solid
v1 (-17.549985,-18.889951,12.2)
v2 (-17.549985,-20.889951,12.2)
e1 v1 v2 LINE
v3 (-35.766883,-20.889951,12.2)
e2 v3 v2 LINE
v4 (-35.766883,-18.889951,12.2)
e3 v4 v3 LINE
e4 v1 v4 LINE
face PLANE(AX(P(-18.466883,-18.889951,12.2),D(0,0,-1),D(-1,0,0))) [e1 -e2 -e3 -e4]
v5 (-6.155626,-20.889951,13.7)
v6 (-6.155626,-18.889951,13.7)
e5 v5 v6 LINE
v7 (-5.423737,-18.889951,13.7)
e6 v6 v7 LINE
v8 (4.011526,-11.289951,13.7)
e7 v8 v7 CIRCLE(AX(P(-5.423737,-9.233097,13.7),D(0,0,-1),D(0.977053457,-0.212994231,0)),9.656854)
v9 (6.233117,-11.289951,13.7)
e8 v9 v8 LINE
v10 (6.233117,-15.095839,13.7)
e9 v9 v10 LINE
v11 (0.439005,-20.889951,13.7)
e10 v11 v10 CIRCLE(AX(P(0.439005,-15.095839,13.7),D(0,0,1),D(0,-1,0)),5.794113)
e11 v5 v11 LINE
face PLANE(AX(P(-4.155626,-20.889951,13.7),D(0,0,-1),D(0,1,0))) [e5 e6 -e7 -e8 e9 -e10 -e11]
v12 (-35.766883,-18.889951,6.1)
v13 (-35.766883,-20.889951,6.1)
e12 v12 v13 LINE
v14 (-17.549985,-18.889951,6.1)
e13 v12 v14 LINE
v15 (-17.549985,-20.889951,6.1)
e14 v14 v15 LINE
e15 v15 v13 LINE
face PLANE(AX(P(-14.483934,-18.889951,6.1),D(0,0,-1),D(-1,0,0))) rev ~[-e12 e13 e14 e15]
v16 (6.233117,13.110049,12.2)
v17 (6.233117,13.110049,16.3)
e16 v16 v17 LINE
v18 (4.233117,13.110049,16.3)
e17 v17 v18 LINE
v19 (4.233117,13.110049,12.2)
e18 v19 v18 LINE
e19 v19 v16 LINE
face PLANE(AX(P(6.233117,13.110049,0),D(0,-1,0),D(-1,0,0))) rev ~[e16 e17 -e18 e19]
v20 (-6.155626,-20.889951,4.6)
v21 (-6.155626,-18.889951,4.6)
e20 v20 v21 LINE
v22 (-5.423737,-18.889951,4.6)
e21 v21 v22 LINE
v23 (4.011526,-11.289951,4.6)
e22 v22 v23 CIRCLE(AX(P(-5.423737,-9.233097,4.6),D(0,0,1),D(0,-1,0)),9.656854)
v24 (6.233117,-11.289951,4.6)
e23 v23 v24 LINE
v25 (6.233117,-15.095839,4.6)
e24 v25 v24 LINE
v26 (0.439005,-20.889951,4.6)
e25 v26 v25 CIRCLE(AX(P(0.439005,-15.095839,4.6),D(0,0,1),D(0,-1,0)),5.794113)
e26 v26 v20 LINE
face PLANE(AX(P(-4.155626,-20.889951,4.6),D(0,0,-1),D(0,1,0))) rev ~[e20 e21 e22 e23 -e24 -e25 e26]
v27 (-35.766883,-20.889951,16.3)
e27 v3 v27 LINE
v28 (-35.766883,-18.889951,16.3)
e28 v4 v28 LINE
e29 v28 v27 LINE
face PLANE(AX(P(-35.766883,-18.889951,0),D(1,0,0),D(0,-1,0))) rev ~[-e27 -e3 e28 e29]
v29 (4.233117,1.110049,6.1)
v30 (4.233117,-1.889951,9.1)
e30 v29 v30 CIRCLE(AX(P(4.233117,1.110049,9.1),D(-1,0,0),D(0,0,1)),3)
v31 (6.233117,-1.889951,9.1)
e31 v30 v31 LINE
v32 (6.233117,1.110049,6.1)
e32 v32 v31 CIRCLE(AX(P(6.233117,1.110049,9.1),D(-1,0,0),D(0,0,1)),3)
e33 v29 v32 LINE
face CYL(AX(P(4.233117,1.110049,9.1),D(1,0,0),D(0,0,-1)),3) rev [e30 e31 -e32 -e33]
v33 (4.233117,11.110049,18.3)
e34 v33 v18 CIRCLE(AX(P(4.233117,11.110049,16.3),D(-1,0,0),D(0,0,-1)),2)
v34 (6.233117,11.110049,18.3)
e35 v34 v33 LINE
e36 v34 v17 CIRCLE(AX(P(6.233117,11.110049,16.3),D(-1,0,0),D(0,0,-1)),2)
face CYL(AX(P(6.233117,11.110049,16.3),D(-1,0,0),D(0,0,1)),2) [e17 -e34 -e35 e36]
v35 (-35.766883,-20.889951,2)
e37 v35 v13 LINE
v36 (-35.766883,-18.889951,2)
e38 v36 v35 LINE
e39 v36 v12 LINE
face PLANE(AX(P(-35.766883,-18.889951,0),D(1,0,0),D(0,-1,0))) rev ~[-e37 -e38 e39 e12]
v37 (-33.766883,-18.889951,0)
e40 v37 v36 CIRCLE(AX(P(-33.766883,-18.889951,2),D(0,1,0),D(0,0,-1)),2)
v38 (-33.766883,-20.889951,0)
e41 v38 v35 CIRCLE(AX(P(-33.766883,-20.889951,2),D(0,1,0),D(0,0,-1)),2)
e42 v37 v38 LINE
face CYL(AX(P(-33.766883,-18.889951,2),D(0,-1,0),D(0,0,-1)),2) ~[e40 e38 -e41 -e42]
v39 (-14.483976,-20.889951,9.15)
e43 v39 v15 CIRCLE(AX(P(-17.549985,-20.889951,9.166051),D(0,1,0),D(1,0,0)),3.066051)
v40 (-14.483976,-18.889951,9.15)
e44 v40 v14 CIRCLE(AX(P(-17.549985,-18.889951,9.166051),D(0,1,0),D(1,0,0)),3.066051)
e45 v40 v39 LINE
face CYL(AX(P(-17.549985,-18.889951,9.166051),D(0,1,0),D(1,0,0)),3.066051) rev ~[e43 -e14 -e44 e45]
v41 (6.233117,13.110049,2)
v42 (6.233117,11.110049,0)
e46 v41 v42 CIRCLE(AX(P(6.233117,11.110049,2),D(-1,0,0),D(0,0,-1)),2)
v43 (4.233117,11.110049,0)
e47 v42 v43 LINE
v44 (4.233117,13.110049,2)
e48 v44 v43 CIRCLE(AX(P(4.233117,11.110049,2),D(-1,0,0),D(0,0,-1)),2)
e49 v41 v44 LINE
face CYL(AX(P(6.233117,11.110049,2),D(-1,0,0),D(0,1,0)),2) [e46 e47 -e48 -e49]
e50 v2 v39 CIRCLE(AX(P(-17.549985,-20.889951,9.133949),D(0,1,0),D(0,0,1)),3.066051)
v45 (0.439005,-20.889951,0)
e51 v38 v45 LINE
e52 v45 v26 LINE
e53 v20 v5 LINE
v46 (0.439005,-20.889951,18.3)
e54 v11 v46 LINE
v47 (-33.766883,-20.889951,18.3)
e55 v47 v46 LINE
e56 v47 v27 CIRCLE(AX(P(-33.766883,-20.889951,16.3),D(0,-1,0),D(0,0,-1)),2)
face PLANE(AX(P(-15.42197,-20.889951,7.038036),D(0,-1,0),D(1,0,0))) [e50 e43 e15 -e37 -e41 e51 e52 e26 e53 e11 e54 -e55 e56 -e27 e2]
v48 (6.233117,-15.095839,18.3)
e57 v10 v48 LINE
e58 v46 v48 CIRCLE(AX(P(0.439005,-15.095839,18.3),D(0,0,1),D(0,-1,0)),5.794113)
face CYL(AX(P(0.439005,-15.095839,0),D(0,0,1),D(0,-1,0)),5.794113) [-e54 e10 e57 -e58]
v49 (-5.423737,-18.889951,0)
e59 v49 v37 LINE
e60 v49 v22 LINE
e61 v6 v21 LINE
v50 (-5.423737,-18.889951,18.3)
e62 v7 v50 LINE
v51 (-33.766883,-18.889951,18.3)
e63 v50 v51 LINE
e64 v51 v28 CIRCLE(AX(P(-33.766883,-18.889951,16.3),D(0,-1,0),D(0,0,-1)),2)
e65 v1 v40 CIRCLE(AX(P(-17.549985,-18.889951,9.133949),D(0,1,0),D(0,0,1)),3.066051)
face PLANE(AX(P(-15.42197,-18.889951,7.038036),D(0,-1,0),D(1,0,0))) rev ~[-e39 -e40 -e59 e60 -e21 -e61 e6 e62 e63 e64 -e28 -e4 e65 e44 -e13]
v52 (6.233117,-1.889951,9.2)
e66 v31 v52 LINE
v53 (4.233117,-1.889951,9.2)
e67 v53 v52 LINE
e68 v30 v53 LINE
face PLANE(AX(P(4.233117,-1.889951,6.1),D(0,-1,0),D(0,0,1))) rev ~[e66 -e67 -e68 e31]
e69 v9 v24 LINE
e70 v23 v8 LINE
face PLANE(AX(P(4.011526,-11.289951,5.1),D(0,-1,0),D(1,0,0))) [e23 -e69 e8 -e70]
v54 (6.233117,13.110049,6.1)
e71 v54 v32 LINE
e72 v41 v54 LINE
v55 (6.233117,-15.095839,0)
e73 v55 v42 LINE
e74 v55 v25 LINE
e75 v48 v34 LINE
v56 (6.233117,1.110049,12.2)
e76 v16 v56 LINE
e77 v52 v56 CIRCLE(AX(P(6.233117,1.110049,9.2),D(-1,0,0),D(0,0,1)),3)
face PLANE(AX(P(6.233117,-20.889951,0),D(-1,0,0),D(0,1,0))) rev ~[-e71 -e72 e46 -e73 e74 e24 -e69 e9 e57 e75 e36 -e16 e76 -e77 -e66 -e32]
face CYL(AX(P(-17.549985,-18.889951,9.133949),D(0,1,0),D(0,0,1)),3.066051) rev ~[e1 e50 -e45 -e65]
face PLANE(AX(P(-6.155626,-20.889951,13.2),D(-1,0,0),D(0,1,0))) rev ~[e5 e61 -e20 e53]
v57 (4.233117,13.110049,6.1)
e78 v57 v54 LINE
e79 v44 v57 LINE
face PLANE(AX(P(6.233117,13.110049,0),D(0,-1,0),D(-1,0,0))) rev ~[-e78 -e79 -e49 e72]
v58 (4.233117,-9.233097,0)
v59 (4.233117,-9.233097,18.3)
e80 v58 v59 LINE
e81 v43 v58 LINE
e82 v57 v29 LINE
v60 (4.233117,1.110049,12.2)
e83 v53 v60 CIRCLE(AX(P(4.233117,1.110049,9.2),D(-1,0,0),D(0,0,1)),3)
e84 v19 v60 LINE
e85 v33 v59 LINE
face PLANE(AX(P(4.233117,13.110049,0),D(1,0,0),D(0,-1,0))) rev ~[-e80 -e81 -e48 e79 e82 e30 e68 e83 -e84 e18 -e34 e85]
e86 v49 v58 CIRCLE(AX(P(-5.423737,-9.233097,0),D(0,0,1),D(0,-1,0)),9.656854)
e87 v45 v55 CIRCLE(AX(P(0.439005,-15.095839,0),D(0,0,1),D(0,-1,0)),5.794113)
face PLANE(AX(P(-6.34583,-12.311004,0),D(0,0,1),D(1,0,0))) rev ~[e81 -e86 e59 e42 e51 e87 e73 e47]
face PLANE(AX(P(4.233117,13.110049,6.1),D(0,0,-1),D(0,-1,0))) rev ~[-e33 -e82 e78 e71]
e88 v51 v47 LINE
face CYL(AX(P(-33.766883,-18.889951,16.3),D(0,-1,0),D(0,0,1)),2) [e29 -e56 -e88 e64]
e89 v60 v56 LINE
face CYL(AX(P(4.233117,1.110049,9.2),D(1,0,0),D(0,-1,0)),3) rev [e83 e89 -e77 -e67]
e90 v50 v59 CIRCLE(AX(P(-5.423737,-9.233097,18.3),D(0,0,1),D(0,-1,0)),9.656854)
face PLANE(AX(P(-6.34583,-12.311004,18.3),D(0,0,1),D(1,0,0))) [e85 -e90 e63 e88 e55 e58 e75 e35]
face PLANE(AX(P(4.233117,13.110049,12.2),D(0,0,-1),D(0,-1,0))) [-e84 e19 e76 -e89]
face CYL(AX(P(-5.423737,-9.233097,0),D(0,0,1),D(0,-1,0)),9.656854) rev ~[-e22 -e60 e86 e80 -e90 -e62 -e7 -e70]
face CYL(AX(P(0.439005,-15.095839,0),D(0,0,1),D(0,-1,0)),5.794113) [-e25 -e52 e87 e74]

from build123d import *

# Parameters (mm, degrees)
F1_DEPTH     = 18.3
F2_W         = 17.3
F2_H         = 6.1
F3_DEPTH     = 25
F4_R         = 9.6568542495
F5_R         = 5.7941125497
F6_W         = 15
F6_H         = 6.1
F7_DEPTH     = 25
F8_R         = 3
F9_R         = 2
F11_DEPTH    = 7.6
F12_W        = 3.9829482868
F12_H        = 6.1
F13_DEPTH    = 25
F14_T1_DEPTH = 2
F15_DEPTH    = 1
F16_DEPTH    = 1
F17_DEPTH    = 2
F18_DEPTH    = 2
F19_DEPTH    = 0.5
F20_DEPTH    = 0.5


# Not quite as in the source:
# - a fillet or chamfer that OpenCascade refuses, or shapes differently, is made with other operations: its cross-section is extruded or revolved along the edge and cut away or added


with BuildPart() as f1:
    # F0 (on Top) → F1 (new body)
    with BuildSketch(Plane.XY):
        Polygon((4.2331174448, -18.8899510824), (-35.7668825552, -18.8899510824), (-35.7668825552, -20.8899510824), (6.2331174448, -20.8899510824), (6.2331174448, 13.1100489176), (4.2331174448, 13.1100489176), align=None)
    extrude(amount=F1_DEPTH)

    # F2 (on face) → F3 (cut)
    with BuildSketch(Plane(origin=(0, -18.8899510824, 0), x_dir=(-1, 0, 0), z_dir=(0, 1, 0))):
        with Locations((27.1168825552, 9.15)):
            Rectangle(F2_W, F2_H)
    extrude(amount=-F3_DEPTH, mode=Mode.SUBTRACT)

    # F4
    f4_edges = [f1.edges().sort_by_distance(p)[0] for p in [
        (4.233117, -18.889951, 9.15),
    ]]
    fillet(f4_edges, radius=F4_R)

    # F5
    f5_edges = [f1.edges().sort_by_distance(p)[0] for p in [
        (6.233117, -20.889951, 9.15),
    ]]
    fillet(f5_edges, radius=F5_R)

    # F6 (on face) → F7 (cut)
    with BuildSketch(Plane(origin=(4.2331174448, 0, 0), x_dir=(0, -1, 0), z_dir=(-1, 0, 0))):
        with Locations((-5.6100489176, 9.15)):
            Rectangle(F6_W, F6_H)
    extrude(amount=-F7_DEPTH, mode=Mode.SUBTRACT)

    # F8
    f8_edges = [f1.edges().sort_by_distance(p)[0] for p in [
        (5.233117, -1.889951, 6.1),
        (5.233117, -1.889951, 12.2),
    ]]
    fillet(f8_edges, radius=F8_R)

    # F9
    f9_edges = [f1.edges().sort_by_distance(p)[0] for p in [
        (5.233117, 13.110049, 0),
        (5.233117, 13.110049, 18.3),
        (-35.766883, -19.889951, 0),
        (-35.766883, -19.889951, 18.3),
    ]]
    fillet(f9_edges, radius=F9_R)

    # F10 (on face) → F11 (cut)
    with BuildSketch(Plane.XZ.offset(20.8899510824)):
        Polygon((7.5907320715, 6.1), (7.5907320715, 9.2), (7.5907320715, 12.2), (-4.1556255892, 12.2), (-4.1556255892, 6.1), align=None)
    extrude(amount=-F11_DEPTH, mode=Mode.SUBTRACT)

    # F12 (on face) → F13 (cut)
    with BuildSketch(Plane(origin=(0, -18.8899510824, 0), x_dir=(-1, 0, 0), z_dir=(0, 1, 0))):
        with Locations((16.4754084118, 9.15)):
            Rectangle(F12_W, F12_H)
    extrude(amount=-F13_DEPTH, mode=Mode.SUBTRACT)

    # F14: fillet of radius 3.0660512242 on 2 edges, made by hand

    # F14_s2 → F14_t1 (join)
    with BuildSketch(Plane.XZ.offset(18.8899510824)):
        with BuildLine():
            ThreePointArc((-14.4839342684, 9.1660512242), (-15.3819598805, 6.9980256121), (-17.5499854926, 6.1))
            Line((-17.5499854926, 6.1), (-14.4839342684, 6.1))
            Line((-14.4839342684, 6.1), (-14.4839342684, 9.1660512242))
        make_face()
        with BuildLine():
            ThreePointArc((-17.5499854926, 12.2), (-15.3819598805, 11.3019743879), (-14.4839342684, 9.1339487758))
            Line((-14.4839342684, 9.1339487758), (-14.4839342684, 12.2))
            Line((-14.4839342684, 12.2), (-17.5499854926, 12.2))
        make_face()
    extrude(amount=F14_T1_DEPTH)

    # F15 (cut): faces of the model
    f15_faces = [f1.faces().sort_by_distance(p)[0] for p in [
        (1.8734055755, -17.7191060476, 6.1),
        (1.8734055755, -17.7191060476, 12.2),
    ]]
    extrude(f15_faces, amount=-F15_DEPTH, dir=(0, 0, 1), mode=Mode.SUBTRACT)

    # F16 (cut): a face of the model
    f16_faces = [f1.faces().sort_by_distance(p)[0] for p in [
        (1.8734055755, -17.7191060476, 12.2),
    ]]
    extrude(f16_faces, amount=-F16_DEPTH, mode=Mode.SUBTRACT)

    # F17 (cut): a face of the model
    f17_faces = [f1.faces().sort_by_distance(p)[0] for p in [
        (-4.1556255892, -19.8481388351, 9.15),
    ]]
    extrude(f17_faces, amount=-F17_DEPTH, mode=Mode.SUBTRACT)

    # F18 (cut): a face of the model
    f18_faces = [f1.faces().sort_by_distance(p)[0] for p in [
        (4.7863785676, -13.2899510824, 9.15),
    ]]
    extrude(f18_faces, amount=-F18_DEPTH, mode=Mode.SUBTRACT)

    # F19 (cut): a face of the model
    f19_faces = [f1.faces().sort_by_distance(p)[0] for p in [
        (1.6308493787, -17.3698716383, 13.2),
    ]]
    extrude(f19_faces, amount=-F19_DEPTH, mode=Mode.SUBTRACT)

    # F20 (cut): a face of the model
    f20_faces = [f1.faces().sort_by_distance(p)[0] for p in [
        (1.6308493787, -17.3698716383, 5.1),
    ]]
    extrude(f20_faces, amount=-F20_DEPTH, mode=Mode.SUBTRACT)


solid = f1.part
